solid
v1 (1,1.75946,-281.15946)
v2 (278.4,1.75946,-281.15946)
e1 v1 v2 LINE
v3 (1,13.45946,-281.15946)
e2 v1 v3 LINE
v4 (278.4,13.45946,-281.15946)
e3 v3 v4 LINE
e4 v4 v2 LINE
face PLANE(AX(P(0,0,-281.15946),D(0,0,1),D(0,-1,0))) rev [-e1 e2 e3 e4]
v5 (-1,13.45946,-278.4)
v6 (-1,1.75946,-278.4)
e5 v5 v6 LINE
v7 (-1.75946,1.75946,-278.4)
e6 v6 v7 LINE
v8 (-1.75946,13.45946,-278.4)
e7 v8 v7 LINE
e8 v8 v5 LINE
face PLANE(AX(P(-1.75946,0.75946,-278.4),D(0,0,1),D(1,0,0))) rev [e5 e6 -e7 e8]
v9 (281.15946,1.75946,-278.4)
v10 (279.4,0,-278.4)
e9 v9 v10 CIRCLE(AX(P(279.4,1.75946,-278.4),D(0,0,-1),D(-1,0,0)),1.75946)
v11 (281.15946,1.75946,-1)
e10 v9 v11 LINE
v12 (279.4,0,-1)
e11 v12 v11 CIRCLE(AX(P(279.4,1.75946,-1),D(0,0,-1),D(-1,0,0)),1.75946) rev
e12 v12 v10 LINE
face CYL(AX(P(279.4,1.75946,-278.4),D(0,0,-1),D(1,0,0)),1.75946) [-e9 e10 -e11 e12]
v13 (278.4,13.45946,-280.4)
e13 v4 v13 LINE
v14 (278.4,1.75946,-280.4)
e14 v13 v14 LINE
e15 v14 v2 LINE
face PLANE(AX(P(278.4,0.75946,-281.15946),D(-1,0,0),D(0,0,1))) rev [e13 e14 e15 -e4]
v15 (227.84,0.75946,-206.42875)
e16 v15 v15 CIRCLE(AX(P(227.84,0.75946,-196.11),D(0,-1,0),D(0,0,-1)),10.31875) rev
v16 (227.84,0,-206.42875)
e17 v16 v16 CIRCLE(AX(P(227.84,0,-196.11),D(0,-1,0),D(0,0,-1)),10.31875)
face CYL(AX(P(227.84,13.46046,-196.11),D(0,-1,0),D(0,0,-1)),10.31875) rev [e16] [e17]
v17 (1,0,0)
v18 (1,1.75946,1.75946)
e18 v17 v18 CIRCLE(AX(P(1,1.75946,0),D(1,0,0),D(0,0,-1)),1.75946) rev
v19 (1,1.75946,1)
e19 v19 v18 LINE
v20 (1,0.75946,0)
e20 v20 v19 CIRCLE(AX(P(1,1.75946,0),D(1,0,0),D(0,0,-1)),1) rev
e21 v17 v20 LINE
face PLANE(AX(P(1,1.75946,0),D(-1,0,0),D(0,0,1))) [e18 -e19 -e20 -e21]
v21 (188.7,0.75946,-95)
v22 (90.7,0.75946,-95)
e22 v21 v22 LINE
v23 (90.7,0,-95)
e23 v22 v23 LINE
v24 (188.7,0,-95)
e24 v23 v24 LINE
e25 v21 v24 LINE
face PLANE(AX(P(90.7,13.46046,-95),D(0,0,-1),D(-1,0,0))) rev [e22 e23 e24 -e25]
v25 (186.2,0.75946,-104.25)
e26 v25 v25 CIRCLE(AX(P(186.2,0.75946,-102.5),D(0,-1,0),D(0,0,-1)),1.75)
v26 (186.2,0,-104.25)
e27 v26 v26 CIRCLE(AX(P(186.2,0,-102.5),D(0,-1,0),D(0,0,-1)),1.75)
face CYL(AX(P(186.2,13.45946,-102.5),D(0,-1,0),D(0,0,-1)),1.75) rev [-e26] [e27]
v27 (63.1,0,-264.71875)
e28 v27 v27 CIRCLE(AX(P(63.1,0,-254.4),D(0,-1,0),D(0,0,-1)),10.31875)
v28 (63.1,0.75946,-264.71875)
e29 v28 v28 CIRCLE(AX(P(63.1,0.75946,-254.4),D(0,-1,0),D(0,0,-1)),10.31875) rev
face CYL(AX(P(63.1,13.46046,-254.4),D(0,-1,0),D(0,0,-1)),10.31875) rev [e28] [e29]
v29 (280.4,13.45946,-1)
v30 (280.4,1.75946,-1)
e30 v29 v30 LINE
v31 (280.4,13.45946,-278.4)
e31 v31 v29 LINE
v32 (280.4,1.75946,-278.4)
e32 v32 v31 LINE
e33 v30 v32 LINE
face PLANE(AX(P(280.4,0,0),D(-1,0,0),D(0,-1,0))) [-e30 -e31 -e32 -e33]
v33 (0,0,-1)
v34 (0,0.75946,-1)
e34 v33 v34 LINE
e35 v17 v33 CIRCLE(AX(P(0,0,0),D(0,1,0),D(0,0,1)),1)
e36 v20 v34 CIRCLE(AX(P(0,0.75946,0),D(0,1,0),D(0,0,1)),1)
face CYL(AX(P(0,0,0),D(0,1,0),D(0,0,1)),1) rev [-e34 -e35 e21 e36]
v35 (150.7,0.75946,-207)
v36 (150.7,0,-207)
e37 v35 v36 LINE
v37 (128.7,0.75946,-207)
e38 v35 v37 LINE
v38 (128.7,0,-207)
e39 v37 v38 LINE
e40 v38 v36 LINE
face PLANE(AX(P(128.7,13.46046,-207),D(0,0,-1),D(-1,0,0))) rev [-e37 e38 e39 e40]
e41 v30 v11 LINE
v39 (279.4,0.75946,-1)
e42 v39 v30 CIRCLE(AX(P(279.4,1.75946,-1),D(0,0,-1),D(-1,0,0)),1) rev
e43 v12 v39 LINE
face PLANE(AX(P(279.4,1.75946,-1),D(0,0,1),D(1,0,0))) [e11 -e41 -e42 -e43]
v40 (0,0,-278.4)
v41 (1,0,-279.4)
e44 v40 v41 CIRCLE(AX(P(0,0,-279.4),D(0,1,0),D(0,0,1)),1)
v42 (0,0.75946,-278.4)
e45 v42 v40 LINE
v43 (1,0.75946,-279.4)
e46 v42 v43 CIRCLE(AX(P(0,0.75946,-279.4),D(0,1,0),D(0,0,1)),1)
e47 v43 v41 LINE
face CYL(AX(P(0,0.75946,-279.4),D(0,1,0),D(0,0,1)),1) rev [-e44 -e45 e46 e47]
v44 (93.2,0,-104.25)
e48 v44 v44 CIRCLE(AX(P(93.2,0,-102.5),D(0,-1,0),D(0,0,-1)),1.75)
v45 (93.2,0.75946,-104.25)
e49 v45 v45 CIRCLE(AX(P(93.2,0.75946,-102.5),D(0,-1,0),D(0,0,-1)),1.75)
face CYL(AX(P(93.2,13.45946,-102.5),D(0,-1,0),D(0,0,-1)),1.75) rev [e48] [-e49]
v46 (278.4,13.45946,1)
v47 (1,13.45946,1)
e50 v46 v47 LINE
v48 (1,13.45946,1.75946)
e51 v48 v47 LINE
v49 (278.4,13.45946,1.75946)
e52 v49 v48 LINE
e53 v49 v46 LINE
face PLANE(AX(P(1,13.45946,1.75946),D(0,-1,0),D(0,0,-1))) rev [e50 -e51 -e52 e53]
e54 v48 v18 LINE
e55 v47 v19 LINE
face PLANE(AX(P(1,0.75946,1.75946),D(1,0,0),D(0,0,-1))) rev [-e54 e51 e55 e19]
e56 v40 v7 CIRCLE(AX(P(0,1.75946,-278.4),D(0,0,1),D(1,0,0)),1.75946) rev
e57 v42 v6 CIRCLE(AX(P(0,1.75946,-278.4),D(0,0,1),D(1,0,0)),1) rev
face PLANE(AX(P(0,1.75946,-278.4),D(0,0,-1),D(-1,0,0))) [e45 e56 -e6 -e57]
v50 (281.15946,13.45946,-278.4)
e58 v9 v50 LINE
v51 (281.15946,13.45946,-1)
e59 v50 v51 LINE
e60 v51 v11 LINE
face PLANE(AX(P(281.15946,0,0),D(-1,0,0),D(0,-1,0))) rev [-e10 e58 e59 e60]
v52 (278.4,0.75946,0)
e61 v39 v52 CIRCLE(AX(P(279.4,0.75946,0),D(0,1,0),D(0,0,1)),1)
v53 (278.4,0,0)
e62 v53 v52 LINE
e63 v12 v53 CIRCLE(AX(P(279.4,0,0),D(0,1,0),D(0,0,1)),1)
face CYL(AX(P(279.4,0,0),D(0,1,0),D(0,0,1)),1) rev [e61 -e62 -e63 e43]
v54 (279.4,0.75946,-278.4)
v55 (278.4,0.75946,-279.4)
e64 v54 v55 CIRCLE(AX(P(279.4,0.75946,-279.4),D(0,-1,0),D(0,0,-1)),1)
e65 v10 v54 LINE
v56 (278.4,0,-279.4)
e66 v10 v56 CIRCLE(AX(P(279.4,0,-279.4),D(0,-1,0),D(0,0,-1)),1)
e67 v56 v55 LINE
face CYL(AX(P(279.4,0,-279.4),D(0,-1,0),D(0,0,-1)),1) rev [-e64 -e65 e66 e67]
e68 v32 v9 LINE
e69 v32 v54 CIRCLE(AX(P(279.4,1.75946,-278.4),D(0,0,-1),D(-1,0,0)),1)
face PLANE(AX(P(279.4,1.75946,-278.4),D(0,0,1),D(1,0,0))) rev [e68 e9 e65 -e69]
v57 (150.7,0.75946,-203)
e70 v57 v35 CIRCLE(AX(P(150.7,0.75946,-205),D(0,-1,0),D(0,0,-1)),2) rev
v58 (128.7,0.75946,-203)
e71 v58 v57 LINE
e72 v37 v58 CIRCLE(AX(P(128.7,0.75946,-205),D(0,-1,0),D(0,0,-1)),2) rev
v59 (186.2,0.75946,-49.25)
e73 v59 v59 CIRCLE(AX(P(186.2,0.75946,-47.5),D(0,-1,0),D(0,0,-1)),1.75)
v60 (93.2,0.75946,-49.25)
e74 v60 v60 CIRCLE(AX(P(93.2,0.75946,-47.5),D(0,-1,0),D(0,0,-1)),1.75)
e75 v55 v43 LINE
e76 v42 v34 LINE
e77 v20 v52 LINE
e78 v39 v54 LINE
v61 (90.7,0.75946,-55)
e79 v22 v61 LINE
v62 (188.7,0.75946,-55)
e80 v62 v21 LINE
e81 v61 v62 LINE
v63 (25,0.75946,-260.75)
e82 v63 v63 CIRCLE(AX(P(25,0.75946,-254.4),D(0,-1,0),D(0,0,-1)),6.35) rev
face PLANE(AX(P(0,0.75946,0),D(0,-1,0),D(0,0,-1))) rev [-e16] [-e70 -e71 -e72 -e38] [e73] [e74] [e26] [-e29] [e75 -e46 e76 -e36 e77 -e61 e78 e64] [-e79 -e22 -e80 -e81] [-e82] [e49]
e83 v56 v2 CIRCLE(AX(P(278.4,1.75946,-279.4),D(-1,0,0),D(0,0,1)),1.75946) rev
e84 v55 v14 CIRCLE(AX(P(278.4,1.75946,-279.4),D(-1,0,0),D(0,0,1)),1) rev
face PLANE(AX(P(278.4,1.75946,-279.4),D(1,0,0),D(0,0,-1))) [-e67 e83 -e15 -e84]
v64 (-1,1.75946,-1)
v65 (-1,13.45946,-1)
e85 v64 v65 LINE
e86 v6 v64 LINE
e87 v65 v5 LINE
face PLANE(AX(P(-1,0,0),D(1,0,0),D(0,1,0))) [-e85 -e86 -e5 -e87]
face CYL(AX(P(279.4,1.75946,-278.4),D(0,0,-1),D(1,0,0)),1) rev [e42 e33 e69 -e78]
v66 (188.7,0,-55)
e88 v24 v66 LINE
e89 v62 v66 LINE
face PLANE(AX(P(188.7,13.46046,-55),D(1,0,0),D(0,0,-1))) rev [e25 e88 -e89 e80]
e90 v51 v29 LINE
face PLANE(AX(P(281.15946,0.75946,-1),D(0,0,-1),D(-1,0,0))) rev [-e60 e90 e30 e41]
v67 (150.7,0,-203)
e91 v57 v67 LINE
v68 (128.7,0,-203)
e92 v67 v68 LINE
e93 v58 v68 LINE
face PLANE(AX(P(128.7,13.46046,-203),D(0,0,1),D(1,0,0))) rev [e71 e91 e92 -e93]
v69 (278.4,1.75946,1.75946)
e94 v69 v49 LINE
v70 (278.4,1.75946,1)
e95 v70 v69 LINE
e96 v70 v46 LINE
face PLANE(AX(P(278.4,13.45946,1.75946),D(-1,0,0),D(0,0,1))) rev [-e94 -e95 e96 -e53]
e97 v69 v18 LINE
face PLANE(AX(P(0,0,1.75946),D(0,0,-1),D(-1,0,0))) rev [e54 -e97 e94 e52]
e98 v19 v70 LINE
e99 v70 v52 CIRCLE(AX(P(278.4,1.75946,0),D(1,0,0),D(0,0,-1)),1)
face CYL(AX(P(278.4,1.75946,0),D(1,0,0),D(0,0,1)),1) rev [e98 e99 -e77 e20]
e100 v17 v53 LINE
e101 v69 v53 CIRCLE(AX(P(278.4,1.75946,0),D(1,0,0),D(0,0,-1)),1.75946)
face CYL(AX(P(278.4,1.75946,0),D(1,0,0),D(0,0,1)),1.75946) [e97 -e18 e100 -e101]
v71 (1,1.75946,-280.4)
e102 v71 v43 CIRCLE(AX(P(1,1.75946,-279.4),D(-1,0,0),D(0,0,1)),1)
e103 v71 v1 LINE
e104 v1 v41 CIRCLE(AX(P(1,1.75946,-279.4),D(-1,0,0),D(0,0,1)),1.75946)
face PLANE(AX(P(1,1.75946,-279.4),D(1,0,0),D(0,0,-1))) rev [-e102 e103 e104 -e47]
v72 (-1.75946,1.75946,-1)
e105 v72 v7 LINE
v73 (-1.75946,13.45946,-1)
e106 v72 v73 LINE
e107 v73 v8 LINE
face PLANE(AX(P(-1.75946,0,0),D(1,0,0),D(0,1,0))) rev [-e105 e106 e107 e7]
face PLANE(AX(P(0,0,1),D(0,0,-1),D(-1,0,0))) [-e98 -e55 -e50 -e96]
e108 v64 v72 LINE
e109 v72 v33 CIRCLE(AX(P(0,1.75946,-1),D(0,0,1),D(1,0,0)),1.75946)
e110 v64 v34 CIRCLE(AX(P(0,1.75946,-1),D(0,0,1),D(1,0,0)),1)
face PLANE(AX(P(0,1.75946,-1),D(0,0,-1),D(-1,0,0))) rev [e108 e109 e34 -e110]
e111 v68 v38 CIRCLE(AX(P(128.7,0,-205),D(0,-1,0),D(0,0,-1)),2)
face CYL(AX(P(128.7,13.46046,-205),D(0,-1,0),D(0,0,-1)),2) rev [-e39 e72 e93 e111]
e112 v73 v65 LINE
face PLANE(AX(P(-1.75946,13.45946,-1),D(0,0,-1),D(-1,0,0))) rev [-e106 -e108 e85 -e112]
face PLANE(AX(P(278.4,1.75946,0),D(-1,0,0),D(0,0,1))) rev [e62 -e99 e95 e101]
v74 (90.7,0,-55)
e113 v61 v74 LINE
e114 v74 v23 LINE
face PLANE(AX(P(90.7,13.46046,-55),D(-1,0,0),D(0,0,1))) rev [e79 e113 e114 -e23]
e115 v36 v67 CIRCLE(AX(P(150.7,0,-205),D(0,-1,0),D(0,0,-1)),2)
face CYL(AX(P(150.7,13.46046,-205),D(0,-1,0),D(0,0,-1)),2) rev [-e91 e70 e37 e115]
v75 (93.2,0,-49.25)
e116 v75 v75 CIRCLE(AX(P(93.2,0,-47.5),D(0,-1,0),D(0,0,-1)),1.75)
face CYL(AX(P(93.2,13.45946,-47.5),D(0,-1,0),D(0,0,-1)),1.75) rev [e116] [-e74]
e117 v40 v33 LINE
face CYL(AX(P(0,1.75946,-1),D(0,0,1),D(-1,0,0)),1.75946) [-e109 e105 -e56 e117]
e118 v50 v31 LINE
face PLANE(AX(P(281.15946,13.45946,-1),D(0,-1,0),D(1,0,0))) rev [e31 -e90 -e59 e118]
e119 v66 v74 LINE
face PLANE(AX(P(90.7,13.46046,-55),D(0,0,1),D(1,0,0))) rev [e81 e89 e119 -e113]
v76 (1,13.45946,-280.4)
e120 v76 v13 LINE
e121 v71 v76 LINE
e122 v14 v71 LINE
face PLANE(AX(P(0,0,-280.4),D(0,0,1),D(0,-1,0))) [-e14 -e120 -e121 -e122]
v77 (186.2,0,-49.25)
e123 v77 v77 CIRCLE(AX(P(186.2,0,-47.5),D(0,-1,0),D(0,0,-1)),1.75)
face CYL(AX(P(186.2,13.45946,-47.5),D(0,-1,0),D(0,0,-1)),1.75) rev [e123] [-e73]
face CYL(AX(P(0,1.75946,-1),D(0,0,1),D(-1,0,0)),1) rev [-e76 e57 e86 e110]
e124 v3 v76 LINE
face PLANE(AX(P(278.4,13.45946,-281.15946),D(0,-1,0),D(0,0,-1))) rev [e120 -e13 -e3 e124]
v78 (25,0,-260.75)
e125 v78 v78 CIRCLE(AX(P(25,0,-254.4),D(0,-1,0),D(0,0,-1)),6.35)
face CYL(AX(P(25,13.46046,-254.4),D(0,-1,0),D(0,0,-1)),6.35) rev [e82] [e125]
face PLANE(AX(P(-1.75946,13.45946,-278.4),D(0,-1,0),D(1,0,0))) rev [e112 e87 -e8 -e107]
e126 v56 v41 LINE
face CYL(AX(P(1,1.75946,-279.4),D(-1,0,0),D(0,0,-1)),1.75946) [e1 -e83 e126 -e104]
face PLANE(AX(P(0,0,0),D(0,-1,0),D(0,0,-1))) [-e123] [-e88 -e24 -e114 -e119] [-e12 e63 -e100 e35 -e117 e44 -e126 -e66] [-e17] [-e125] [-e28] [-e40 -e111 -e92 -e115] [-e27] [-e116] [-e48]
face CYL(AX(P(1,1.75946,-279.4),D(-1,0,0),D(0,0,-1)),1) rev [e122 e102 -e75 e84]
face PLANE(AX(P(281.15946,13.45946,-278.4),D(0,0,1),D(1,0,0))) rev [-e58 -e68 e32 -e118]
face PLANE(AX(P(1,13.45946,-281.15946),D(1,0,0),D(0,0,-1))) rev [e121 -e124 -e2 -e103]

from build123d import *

# Parameters (mm, degrees)
SKETCH1_W                 = 279.4
SKETCH1_H                 = 279.4
BASE_FLANGE1_DEPTH        = 0.75946
SKETCH4_R                 = 1
CUT_EXTRUDE1_DEPTH        = 396.131999184
EDGE_FLANGE1_DEPTH        = 277.4
EDGE_FLANGE1_BEND_DEPTH   = 277.4
EDGE_FLANGE1_BEND_2_DEPTH = 277.4
EDGE_FLANGE1_BEND_3_DEPTH = 277.4
CUT_EXTRUDE2_REACH        = 399.847
SKETCH17_R                = 6.35
SKETCH17_R_2              = 10.31875
SKETCH17_W                = 98
SKETCH17_H                = 40
SKETCH19_R                = 1.75
CUT_EXTRUDE4_DEPTH        = 398.847258327


# Sheet-metal steps are written as plain solids
with BuildPart() as part:
    # Sketch1 → Base-Flange1 (new body)
    with BuildSketch(Plane(origin=(0, 0, 0), x_dir=(1, 0, 0), z_dir=(0, 1, 0))):
        with Locations((139.7, 139.7)):
            Rectangle(SKETCH1_W, SKETCH1_H)
    extrude(amount=BASE_FLANGE1_DEPTH)

    # Sketch4 → Cut-Extrude1 (cut, through all)
    with BuildSketch(Plane(origin=(0, 0.75946, 0), x_dir=(1, 0, 0), z_dir=(0, 1, 0))):
        Circle(SKETCH4_R)
        with Locations((0, 279.4)):
            Circle(SKETCH4_R)
        with Locations((279.4, 279.4)):
            Circle(SKETCH4_R)
        with Locations((279.4, 0)):
            Circle(SKETCH4_R)
    extrude(amount=-CUT_EXTRUDE1_DEPTH, mode=Mode.SUBTRACT)

    # Edge-Flange1 section (across the edge) → Edge-Flange1 (add)
    with BuildSketch(Plane(origin=(278.4, 0.75946, -280.4), x_dir=(0, 0, 1), z_dir=(-1, 0, 0))):
        with BuildLine():
            Line((-0.75946, 1), (-0.75946, 12.7))
            Line((-0.75946, 12.7), (0, 12.7))
            Line((0, 12.7), (0, 1))
            ThreePointArc((0, 1), (0.292893219, 0.292893219), (1, 0))
            Line((1, 0), (1, -0.75946))
            ThreePointArc((1, -0.75946), (-0.244126097, -0.244126097), (-0.75946, 1))
        make_face()
    extrude(amount=EDGE_FLANGE1_DEPTH)

    # Edge-Flange1 section 2 (across the edge) → Edge-Flange1 bend (add)
    with BuildSketch(Plane(origin=(-1, 0.75946, -278.4), x_dir=(1, 0, 0), z_dir=(0, 0, 1))):
        with BuildLine():
            Line((-0.75946, 1), (-0.75946, 12.7))
            Line((-0.75946, 12.7), (0, 12.7))
            Line((0, 12.7), (0, 1))
            ThreePointArc((0, 1), (0.292893219, 0.292893219), (1, 0))
            Line((1, 0), (1, -0.75946))
            ThreePointArc((1, -0.75946), (-0.244126097, -0.244126097), (-0.75946, 1))
        make_face()
    extrude(amount=EDGE_FLANGE1_BEND_DEPTH)

    # Edge-Flange1 section 3 (across the edge) → Edge-Flange1 bend 2 (add)
    with BuildSketch(Plane(origin=(1, 0.75946, 1), x_dir=(0, 0, -1), z_dir=(1, 0, 0))):
        with BuildLine():
            Line((-0.75946, 1), (-0.75946, 12.7))
            Line((-0.75946, 12.7), (0, 12.7))
            Line((0, 12.7), (0, 1))
            ThreePointArc((0, 1), (0.292893219, 0.292893219), (1, 0))
            Line((1, 0), (1, -0.75946))
            ThreePointArc((1, -0.75946), (-0.244126097, -0.244126097), (-0.75946, 1))
        make_face()
    extrude(amount=EDGE_FLANGE1_BEND_2_DEPTH)

    # Edge-Flange1 section 4 (across the edge) → Edge-Flange1 bend 3 (add)
    with BuildSketch(Plane(origin=(280.4, 0.75946, -1), x_dir=(-1, 0, 0), z_dir=(0, 0, -1))):
        with BuildLine():
            Line((-0.75946, 1), (-0.75946, 12.7))
            Line((-0.75946, 12.7), (0, 12.7))
            Line((0, 12.7), (0, 1))
            ThreePointArc((0, 1), (0.292893219, 0.292893219), (1, 0))
            Line((1, 0), (1, -0.75946))
            ThreePointArc((1, -0.75946), (-0.244126097, -0.244126097), (-0.75946, 1))
        make_face()
    extrude(amount=EDGE_FLANGE1_BEND_3_DEPTH)

    # Sketch17 → Cut-Extrude2 (cut, up to next)
    with BuildSketch(Plane.XZ, mode=Mode.PRIVATE) as cut_extrude2_sk1:
        with Locations(Location((25, -254.4, 0), (0, 0, 270))):
            Circle(SKETCH17_R)
    cut_extrude2_tool1 = extrude(cut_extrude2_sk1.sketch, amount=-CUT_EXTRUDE2_REACH, mode=Mode.PRIVATE) & part.part
    # Sketch17 → Cut-Extrude2 (cut, up to next)
    with BuildSketch(Plane.XZ, mode=Mode.PRIVATE) as cut_extrude2_sk2:
        with Locations(Location((63.1, -254.4, 0), (0, 0, 270))):
            Circle(SKETCH17_R_2)
    cut_extrude2_tool2 = extrude(cut_extrude2_sk2.sketch, amount=-CUT_EXTRUDE2_REACH, mode=Mode.PRIVATE) & part.part
    # Sketch17 → Cut-Extrude2 (cut, up to next)
    with BuildSketch(Plane.XZ, mode=Mode.PRIVATE) as cut_extrude2_sk3:
        with Locations(Location((227.84, -196.11, 0), (0, 0, 270))):
            Circle(SKETCH17_R_2)
    cut_extrude2_tool3 = extrude(cut_extrude2_sk3.sketch, amount=-CUT_EXTRUDE2_REACH, mode=Mode.PRIVATE) & part.part
    # Sketch17 → Cut-Extrude2 (cut, up to next)
    with BuildSketch(Plane.XZ, mode=Mode.PRIVATE) as cut_extrude2_sk4:
        with Locations((139.7, -75)):
            Rectangle(SKETCH17_W, SKETCH17_H)
    cut_extrude2_tool4 = extrude(cut_extrude2_sk4.sketch, amount=-CUT_EXTRUDE2_REACH, mode=Mode.PRIVATE) & part.part
    # Sketch17 → Cut-Extrude2 (cut, up to next)
    with BuildSketch(Plane.XZ, mode=Mode.PRIVATE) as cut_extrude2_sk5:
        with BuildLine():
            Line((128.7, -203), (150.7, -203))
            ThreePointArc((150.7, -203), (152.7, -205), (150.7, -207))
            Line((150.7, -207), (128.7, -207))
            ThreePointArc((128.7, -207), (126.7, -205), (128.7, -203))
        make_face()
    cut_extrude2_tool5 = extrude(cut_extrude2_sk5.sketch, amount=-CUT_EXTRUDE2_REACH, mode=Mode.PRIVATE) & part.part
    add(cut_extrude2_tool1.solids().sort_by_distance((25, 0, -254.4))[0], mode=Mode.SUBTRACT)
    add(cut_extrude2_tool2.solids().sort_by_distance((63.1, 0, -254.4))[0], mode=Mode.SUBTRACT)
    add(cut_extrude2_tool3.solids().sort_by_distance((227.84, 0, -196.11))[0], mode=Mode.SUBTRACT)
    add(cut_extrude2_tool4.solids().sort_by_distance((139.7, 0, -75))[0], mode=Mode.SUBTRACT)
    add(cut_extrude2_tool5.solids().sort_by_distance((139.7, 0, -205))[0], mode=Mode.SUBTRACT)

    # Sketch19 → Cut-Extrude4 (cut, through all)
    with BuildSketch(Plane.XZ):
        with Locations(Location((93.2, -47.5, 0), (0, 0, 270))):
            Circle(SKETCH19_R)
        with Locations(Location((186.2, -47.5, 0), (0, 0, 270))):
            Circle(SKETCH19_R)
        with Locations(Location((186.2, -102.5, 0), (0, 0, 270))):
            Circle(SKETCH19_R)
        with Locations(Location((93.2, -102.5, 0), (0, 0, 270))):
            Circle(SKETCH19_R)
    extrude(amount=-CUT_EXTRUDE4_DEPTH, mode=Mode.SUBTRACT)


solid = part.part
